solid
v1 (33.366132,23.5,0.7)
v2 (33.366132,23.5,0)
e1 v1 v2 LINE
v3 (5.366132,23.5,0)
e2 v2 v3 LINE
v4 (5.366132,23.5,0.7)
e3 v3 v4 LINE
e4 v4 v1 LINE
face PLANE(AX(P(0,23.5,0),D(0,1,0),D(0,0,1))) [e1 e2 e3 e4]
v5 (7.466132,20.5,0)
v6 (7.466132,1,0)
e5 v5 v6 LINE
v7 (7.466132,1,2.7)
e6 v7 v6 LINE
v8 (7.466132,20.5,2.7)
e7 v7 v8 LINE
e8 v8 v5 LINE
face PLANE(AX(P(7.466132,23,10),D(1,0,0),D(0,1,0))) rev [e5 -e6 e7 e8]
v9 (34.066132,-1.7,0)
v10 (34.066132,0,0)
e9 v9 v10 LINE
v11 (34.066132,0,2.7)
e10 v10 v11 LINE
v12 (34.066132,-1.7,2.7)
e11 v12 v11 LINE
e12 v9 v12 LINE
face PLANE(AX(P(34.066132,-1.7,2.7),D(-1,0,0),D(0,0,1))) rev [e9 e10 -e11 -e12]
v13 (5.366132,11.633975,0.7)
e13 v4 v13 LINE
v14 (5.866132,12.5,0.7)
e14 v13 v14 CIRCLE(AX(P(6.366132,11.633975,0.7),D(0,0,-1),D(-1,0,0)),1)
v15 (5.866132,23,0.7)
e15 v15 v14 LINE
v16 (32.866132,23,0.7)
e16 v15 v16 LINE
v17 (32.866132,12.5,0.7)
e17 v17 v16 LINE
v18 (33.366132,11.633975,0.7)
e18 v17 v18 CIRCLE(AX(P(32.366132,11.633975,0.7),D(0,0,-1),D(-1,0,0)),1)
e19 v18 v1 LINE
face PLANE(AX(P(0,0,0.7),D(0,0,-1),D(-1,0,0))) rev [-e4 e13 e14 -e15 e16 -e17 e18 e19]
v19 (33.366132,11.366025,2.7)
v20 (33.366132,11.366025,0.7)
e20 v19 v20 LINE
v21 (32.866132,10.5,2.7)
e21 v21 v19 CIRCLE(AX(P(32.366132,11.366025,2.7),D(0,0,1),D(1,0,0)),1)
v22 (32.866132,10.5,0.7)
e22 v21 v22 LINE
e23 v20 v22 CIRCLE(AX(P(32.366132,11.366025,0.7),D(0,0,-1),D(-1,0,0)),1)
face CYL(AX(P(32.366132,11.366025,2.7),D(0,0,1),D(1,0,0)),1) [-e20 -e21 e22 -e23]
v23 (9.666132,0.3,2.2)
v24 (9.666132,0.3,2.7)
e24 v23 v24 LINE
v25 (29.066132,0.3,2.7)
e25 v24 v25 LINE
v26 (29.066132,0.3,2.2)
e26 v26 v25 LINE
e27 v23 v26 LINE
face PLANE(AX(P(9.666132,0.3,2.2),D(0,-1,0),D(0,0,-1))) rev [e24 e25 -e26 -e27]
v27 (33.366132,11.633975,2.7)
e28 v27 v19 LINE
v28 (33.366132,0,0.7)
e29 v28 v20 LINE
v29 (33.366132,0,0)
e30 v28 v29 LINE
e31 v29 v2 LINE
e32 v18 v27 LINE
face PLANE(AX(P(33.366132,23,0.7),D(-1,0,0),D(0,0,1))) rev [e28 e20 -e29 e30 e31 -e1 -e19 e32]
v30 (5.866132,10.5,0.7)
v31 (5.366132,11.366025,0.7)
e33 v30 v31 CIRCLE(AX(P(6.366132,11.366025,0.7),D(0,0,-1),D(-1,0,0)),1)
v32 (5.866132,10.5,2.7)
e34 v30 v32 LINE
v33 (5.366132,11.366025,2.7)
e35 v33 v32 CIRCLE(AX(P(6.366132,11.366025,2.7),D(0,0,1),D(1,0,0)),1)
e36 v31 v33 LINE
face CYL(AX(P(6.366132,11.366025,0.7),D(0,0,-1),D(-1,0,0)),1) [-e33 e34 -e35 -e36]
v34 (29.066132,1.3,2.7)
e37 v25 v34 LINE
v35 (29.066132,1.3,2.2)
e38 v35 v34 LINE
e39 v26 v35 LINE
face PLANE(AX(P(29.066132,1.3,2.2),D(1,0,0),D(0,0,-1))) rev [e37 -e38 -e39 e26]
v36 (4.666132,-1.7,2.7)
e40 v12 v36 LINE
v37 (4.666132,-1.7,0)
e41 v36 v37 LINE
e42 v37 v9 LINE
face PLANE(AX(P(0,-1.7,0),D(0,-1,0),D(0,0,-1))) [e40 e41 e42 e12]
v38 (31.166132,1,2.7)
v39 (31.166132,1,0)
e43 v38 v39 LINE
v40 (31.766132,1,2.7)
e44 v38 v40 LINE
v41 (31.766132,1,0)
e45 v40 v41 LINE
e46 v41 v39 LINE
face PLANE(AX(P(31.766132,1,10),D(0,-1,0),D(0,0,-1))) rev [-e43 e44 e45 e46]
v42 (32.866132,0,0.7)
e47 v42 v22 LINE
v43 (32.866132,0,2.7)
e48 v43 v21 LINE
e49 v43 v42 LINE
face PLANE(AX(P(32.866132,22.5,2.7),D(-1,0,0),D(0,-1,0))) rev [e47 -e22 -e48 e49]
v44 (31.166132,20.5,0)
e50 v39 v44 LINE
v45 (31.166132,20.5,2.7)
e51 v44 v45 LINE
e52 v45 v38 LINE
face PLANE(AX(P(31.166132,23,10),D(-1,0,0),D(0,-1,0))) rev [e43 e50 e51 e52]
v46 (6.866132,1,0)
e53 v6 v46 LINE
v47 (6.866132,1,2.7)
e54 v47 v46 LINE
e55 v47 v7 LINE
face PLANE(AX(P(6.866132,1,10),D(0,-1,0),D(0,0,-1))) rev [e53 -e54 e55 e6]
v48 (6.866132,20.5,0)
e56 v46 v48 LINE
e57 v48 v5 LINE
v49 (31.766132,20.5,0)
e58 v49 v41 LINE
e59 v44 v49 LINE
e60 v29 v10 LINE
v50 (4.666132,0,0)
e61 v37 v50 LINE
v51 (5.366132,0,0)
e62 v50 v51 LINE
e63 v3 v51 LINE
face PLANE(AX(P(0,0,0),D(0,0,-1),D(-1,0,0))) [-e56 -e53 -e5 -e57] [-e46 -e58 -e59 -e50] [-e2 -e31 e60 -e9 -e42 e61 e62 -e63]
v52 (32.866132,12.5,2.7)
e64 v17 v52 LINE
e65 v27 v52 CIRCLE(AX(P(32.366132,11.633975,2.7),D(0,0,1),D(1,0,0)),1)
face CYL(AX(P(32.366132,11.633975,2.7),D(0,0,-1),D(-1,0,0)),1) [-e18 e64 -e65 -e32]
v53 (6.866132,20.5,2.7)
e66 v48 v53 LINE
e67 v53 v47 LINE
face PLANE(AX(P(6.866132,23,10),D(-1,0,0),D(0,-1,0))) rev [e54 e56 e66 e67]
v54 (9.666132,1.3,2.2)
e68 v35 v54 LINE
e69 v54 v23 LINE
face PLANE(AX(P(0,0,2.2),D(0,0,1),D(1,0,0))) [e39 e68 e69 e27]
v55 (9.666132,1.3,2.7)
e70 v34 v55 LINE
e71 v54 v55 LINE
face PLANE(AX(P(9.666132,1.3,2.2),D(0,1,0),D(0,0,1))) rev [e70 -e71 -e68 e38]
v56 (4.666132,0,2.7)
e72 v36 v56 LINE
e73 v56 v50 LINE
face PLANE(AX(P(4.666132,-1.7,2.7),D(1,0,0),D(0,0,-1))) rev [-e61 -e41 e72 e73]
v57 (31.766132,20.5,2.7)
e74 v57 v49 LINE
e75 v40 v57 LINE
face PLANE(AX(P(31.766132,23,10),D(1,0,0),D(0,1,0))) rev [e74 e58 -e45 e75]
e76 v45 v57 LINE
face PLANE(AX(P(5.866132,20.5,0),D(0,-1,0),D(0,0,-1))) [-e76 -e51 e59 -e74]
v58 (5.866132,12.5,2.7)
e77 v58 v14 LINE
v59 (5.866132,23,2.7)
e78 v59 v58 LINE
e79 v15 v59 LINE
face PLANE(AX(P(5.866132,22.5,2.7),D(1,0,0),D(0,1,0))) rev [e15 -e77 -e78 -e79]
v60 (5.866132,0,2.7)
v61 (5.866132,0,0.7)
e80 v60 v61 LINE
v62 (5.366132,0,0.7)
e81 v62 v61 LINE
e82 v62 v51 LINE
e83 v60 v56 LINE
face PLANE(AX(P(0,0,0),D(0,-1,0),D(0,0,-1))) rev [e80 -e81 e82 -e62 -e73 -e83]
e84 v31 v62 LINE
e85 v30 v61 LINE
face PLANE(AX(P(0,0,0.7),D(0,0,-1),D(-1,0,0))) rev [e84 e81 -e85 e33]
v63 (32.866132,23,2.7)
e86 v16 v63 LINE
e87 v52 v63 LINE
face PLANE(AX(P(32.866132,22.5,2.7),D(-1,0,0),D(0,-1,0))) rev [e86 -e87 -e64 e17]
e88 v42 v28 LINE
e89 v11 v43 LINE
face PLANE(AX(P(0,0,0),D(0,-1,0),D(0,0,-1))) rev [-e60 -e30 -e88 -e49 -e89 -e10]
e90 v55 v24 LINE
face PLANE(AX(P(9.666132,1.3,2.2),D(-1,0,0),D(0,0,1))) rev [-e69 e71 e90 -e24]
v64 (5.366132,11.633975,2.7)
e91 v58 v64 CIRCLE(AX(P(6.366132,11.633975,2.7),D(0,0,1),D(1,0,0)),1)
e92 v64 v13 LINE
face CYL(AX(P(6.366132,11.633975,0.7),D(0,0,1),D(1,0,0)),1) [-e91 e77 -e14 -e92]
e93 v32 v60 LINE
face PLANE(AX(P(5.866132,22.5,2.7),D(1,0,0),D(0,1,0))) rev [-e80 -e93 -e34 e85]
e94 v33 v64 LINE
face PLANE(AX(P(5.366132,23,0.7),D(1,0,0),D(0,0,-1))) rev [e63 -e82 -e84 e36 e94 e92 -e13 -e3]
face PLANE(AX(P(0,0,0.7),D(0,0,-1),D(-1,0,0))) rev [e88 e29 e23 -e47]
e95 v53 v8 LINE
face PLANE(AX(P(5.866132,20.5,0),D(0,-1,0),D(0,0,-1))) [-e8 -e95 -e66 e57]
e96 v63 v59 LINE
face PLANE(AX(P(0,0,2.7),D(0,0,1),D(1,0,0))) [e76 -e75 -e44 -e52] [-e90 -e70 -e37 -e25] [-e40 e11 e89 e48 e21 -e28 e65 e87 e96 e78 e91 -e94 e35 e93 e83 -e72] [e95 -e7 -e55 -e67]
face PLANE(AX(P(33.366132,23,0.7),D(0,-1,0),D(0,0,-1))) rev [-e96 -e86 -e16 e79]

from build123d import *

# Parameters (mm, degrees)
SKIZZE1_W                       = 28
SKIZZE1_H                       = 23
AUFSATZ_LINEAR_AUSTRAGEN1_DEPTH = 0.7
SKIZZE3_W                       = 27
SKIZZE3_H                       = 22.5
AUFSATZ_LINEAR_AUSTRAGEN2_DEPTH = 2
AUFSATZ_LINEAR_AUSTRAGEN4_DEPTH = 1.7
SKIZZE6_W                       = 0.6
SKIZZE6_H                       = 22
SCHNITT_LINEAR_AUSTRAGEN1_DEPTH = 10
SKIZZE7_W                       = 2
SKIZZE7_H                       = 2
AUFSATZ_LINEAR_AUSTRAGEN5_DEPTH = 0.5
SKIZZE8_W                       = 2
SKIZZE8_H                       = 2
AUFSATZ_LINEAR_AUSTRAGEN6_DEPTH = 0.5
VERRUNDUNG1_R                   = 1
VERRUNDUNG2_R                   = 1
SKIZZE9_W                       = 27
SKIZZE9_H                       = 2.5
AUFSATZ_LINEAR_AUSTRAGEN7_DEPTH = 2.7
SKIZZE10_W                      = 28
SKIZZE10_H                      = 0.7
AUFSATZ_LINEAR_AUSTRAGEN8_DEPTH = 0.5
SKIZZE11_W                      = 19.4
SKIZZE11_H                      = 1
SCHNITT_LINEAR_AUSTRAGEN2_DEPTH = 0.5


with BuildPart() as part:
    # Skizze1 → Aufsatz-Linear austragen1 (new body)
    with BuildSketch(Plane.XY):
        with Locations((19.366132402, 11.5)):
            Rectangle(SKIZZE1_W, SKIZZE1_H)
    extrude(amount=AUFSATZ_LINEAR_AUSTRAGEN1_DEPTH)

    # Skizze3 → Aufsatz-Linear austragen2 (add)
    with BuildSketch(Plane.XY.offset(0.7)):
        with Locations((19.366132402, 11.25)):
            Rectangle(SKIZZE3_W, SKIZZE3_H)
    extrude(amount=AUFSATZ_LINEAR_AUSTRAGEN2_DEPTH)

    # Skizze5 → Aufsatz-Linear austragen4 (add)
    with BuildSketch(Plane.XZ):
        Polygon((5.866132402, 2.7), (32.866132402, 2.7), (34.066132402, 2.7), (34.066132402, 0), (33.366132402, 0), (5.366132402, 0), (4.666132402, 0), (4.666132402, 2.7), align=None)
    extrude(amount=AUFSATZ_LINEAR_AUSTRAGEN4_DEPTH)

    # Skizze6 → Schnitt-Linear austragen1 (cut)
    with BuildSketch(Plane(origin=(0, 0, 0), x_dir=(-1, 0, 0), z_dir=(0, 0, -1))):
        with Locations((-31.466132402, 12)):
            Rectangle(SKIZZE6_W, SKIZZE6_H)
        with Locations((-7.166132402, 12)):
            Rectangle(SKIZZE6_W, SKIZZE6_H)
    extrude(amount=-SCHNITT_LINEAR_AUSTRAGEN1_DEPTH, mode=Mode.SUBTRACT)

    # Skizze7 → Aufsatz-Linear austragen5 (add)
    with BuildSketch(Plane(origin=(32.866132402, 0, 0), x_dir=(0, 0, -1), z_dir=(1, 0, 0))):
        with Locations((-1.7, 11.5)):
            Rectangle(SKIZZE7_W, SKIZZE7_H)
    extrude(amount=AUFSATZ_LINEAR_AUSTRAGEN5_DEPTH)

    # Skizze8 → Aufsatz-Linear austragen6 (add)
    with BuildSketch(Plane.ZY.offset(-5.866132402)):
        with Locations((1.7, 11.5)):
            Rectangle(SKIZZE8_W, SKIZZE8_H)
    extrude(amount=AUFSATZ_LINEAR_AUSTRAGEN6_DEPTH)

    # Verrundung1
    # the kernel refuses this fillet: 1 mm, written as the material it takes off along each edge
    with BuildSketch(Plane(origin=(33.366132402, 10.5, 0.7), x_dir=(-1, 0, 0), z_dir=(0, 0, 1))) as verrundung1_piece_1:
        with BuildLine():
            CenterArc((1, -0.866025404), VERRUNDUNG1_R, 120, 60)
            Line((0, -0.866025404), (0, 0))
            Line((0, 0), (0.5, 0))
        make_face()
    extrude(amount=4.165063509, mode=Mode.SUBTRACT)
    with BuildSketch(Plane(origin=(33.366132402, 12.5, 4.865063509), x_dir=(0, -1, 0), z_dir=(0, 0, -1))) as verrundung1_piece_2:
        with BuildLine():
            CenterArc((0.866025404, 1), VERRUNDUNG1_R, 210, 60)
            Line((0, 0.5), (0, 0))
            Line((0, 0), (0.866025404, 0))
        make_face()
    extrude(amount=4.165063509, mode=Mode.SUBTRACT)

    # Verrundung2
    # the kernel refuses this fillet: 1 mm, written as the material it takes off along each edge
    with BuildSketch(Plane(origin=(5.366132402, 12.5, 0.7), x_dir=(1, 0, 0), z_dir=(0, 0, 1))) as verrundung2_piece_1:
        with BuildLine():
            CenterArc((1, -0.866025404), VERRUNDUNG2_R, 120, 60)
            Line((0, -0.866025404), (0, 0))
            Line((0, 0), (0.5, 0))
        make_face()
    extrude(amount=4.165063509, mode=Mode.SUBTRACT)
    with BuildSketch(Plane(origin=(5.366132402, 10.5, 4.865063509), x_dir=(0, 1, 0), z_dir=(0, 0, -1))) as verrundung2_piece_2:
        with BuildLine():
            CenterArc((0.866025404, 1), VERRUNDUNG2_R, 210, 60)
            Line((0, 0.5), (0, 0))
            Line((0, 0), (0.866025404, 0))
        make_face()
    extrude(amount=4.165063509, mode=Mode.SUBTRACT)

    # Skizze9 → Aufsatz-Linear austragen7 (add)
    with BuildSketch(Plane.XY.offset(2.7)):
        with Locations((19.366132402, 21.75)):
            Rectangle(SKIZZE9_W, SKIZZE9_H)
    extrude(amount=-AUFSATZ_LINEAR_AUSTRAGEN7_DEPTH)

    # Skizze10 → Aufsatz-Linear austragen8 (add)
    with BuildSketch(Plane(origin=(0, 23, 0), x_dir=(1, 0, 0), z_dir=(0, 1, 0))):
        with Locations((19.366132402, -0.35)):
            Rectangle(SKIZZE10_W, SKIZZE10_H)
    extrude(amount=AUFSATZ_LINEAR_AUSTRAGEN8_DEPTH)

    # Skizze11 → Schnitt-Linear austragen2 (cut)
    with BuildSketch(Plane.XY.offset(2.7)):
        with Locations((19.366132402, 0.8)):
            Rectangle(SKIZZE11_W, SKIZZE11_H)
    extrude(amount=-SCHNITT_LINEAR_AUSTRAGEN2_DEPTH, mode=Mode.SUBTRACT)


solid = part.part
